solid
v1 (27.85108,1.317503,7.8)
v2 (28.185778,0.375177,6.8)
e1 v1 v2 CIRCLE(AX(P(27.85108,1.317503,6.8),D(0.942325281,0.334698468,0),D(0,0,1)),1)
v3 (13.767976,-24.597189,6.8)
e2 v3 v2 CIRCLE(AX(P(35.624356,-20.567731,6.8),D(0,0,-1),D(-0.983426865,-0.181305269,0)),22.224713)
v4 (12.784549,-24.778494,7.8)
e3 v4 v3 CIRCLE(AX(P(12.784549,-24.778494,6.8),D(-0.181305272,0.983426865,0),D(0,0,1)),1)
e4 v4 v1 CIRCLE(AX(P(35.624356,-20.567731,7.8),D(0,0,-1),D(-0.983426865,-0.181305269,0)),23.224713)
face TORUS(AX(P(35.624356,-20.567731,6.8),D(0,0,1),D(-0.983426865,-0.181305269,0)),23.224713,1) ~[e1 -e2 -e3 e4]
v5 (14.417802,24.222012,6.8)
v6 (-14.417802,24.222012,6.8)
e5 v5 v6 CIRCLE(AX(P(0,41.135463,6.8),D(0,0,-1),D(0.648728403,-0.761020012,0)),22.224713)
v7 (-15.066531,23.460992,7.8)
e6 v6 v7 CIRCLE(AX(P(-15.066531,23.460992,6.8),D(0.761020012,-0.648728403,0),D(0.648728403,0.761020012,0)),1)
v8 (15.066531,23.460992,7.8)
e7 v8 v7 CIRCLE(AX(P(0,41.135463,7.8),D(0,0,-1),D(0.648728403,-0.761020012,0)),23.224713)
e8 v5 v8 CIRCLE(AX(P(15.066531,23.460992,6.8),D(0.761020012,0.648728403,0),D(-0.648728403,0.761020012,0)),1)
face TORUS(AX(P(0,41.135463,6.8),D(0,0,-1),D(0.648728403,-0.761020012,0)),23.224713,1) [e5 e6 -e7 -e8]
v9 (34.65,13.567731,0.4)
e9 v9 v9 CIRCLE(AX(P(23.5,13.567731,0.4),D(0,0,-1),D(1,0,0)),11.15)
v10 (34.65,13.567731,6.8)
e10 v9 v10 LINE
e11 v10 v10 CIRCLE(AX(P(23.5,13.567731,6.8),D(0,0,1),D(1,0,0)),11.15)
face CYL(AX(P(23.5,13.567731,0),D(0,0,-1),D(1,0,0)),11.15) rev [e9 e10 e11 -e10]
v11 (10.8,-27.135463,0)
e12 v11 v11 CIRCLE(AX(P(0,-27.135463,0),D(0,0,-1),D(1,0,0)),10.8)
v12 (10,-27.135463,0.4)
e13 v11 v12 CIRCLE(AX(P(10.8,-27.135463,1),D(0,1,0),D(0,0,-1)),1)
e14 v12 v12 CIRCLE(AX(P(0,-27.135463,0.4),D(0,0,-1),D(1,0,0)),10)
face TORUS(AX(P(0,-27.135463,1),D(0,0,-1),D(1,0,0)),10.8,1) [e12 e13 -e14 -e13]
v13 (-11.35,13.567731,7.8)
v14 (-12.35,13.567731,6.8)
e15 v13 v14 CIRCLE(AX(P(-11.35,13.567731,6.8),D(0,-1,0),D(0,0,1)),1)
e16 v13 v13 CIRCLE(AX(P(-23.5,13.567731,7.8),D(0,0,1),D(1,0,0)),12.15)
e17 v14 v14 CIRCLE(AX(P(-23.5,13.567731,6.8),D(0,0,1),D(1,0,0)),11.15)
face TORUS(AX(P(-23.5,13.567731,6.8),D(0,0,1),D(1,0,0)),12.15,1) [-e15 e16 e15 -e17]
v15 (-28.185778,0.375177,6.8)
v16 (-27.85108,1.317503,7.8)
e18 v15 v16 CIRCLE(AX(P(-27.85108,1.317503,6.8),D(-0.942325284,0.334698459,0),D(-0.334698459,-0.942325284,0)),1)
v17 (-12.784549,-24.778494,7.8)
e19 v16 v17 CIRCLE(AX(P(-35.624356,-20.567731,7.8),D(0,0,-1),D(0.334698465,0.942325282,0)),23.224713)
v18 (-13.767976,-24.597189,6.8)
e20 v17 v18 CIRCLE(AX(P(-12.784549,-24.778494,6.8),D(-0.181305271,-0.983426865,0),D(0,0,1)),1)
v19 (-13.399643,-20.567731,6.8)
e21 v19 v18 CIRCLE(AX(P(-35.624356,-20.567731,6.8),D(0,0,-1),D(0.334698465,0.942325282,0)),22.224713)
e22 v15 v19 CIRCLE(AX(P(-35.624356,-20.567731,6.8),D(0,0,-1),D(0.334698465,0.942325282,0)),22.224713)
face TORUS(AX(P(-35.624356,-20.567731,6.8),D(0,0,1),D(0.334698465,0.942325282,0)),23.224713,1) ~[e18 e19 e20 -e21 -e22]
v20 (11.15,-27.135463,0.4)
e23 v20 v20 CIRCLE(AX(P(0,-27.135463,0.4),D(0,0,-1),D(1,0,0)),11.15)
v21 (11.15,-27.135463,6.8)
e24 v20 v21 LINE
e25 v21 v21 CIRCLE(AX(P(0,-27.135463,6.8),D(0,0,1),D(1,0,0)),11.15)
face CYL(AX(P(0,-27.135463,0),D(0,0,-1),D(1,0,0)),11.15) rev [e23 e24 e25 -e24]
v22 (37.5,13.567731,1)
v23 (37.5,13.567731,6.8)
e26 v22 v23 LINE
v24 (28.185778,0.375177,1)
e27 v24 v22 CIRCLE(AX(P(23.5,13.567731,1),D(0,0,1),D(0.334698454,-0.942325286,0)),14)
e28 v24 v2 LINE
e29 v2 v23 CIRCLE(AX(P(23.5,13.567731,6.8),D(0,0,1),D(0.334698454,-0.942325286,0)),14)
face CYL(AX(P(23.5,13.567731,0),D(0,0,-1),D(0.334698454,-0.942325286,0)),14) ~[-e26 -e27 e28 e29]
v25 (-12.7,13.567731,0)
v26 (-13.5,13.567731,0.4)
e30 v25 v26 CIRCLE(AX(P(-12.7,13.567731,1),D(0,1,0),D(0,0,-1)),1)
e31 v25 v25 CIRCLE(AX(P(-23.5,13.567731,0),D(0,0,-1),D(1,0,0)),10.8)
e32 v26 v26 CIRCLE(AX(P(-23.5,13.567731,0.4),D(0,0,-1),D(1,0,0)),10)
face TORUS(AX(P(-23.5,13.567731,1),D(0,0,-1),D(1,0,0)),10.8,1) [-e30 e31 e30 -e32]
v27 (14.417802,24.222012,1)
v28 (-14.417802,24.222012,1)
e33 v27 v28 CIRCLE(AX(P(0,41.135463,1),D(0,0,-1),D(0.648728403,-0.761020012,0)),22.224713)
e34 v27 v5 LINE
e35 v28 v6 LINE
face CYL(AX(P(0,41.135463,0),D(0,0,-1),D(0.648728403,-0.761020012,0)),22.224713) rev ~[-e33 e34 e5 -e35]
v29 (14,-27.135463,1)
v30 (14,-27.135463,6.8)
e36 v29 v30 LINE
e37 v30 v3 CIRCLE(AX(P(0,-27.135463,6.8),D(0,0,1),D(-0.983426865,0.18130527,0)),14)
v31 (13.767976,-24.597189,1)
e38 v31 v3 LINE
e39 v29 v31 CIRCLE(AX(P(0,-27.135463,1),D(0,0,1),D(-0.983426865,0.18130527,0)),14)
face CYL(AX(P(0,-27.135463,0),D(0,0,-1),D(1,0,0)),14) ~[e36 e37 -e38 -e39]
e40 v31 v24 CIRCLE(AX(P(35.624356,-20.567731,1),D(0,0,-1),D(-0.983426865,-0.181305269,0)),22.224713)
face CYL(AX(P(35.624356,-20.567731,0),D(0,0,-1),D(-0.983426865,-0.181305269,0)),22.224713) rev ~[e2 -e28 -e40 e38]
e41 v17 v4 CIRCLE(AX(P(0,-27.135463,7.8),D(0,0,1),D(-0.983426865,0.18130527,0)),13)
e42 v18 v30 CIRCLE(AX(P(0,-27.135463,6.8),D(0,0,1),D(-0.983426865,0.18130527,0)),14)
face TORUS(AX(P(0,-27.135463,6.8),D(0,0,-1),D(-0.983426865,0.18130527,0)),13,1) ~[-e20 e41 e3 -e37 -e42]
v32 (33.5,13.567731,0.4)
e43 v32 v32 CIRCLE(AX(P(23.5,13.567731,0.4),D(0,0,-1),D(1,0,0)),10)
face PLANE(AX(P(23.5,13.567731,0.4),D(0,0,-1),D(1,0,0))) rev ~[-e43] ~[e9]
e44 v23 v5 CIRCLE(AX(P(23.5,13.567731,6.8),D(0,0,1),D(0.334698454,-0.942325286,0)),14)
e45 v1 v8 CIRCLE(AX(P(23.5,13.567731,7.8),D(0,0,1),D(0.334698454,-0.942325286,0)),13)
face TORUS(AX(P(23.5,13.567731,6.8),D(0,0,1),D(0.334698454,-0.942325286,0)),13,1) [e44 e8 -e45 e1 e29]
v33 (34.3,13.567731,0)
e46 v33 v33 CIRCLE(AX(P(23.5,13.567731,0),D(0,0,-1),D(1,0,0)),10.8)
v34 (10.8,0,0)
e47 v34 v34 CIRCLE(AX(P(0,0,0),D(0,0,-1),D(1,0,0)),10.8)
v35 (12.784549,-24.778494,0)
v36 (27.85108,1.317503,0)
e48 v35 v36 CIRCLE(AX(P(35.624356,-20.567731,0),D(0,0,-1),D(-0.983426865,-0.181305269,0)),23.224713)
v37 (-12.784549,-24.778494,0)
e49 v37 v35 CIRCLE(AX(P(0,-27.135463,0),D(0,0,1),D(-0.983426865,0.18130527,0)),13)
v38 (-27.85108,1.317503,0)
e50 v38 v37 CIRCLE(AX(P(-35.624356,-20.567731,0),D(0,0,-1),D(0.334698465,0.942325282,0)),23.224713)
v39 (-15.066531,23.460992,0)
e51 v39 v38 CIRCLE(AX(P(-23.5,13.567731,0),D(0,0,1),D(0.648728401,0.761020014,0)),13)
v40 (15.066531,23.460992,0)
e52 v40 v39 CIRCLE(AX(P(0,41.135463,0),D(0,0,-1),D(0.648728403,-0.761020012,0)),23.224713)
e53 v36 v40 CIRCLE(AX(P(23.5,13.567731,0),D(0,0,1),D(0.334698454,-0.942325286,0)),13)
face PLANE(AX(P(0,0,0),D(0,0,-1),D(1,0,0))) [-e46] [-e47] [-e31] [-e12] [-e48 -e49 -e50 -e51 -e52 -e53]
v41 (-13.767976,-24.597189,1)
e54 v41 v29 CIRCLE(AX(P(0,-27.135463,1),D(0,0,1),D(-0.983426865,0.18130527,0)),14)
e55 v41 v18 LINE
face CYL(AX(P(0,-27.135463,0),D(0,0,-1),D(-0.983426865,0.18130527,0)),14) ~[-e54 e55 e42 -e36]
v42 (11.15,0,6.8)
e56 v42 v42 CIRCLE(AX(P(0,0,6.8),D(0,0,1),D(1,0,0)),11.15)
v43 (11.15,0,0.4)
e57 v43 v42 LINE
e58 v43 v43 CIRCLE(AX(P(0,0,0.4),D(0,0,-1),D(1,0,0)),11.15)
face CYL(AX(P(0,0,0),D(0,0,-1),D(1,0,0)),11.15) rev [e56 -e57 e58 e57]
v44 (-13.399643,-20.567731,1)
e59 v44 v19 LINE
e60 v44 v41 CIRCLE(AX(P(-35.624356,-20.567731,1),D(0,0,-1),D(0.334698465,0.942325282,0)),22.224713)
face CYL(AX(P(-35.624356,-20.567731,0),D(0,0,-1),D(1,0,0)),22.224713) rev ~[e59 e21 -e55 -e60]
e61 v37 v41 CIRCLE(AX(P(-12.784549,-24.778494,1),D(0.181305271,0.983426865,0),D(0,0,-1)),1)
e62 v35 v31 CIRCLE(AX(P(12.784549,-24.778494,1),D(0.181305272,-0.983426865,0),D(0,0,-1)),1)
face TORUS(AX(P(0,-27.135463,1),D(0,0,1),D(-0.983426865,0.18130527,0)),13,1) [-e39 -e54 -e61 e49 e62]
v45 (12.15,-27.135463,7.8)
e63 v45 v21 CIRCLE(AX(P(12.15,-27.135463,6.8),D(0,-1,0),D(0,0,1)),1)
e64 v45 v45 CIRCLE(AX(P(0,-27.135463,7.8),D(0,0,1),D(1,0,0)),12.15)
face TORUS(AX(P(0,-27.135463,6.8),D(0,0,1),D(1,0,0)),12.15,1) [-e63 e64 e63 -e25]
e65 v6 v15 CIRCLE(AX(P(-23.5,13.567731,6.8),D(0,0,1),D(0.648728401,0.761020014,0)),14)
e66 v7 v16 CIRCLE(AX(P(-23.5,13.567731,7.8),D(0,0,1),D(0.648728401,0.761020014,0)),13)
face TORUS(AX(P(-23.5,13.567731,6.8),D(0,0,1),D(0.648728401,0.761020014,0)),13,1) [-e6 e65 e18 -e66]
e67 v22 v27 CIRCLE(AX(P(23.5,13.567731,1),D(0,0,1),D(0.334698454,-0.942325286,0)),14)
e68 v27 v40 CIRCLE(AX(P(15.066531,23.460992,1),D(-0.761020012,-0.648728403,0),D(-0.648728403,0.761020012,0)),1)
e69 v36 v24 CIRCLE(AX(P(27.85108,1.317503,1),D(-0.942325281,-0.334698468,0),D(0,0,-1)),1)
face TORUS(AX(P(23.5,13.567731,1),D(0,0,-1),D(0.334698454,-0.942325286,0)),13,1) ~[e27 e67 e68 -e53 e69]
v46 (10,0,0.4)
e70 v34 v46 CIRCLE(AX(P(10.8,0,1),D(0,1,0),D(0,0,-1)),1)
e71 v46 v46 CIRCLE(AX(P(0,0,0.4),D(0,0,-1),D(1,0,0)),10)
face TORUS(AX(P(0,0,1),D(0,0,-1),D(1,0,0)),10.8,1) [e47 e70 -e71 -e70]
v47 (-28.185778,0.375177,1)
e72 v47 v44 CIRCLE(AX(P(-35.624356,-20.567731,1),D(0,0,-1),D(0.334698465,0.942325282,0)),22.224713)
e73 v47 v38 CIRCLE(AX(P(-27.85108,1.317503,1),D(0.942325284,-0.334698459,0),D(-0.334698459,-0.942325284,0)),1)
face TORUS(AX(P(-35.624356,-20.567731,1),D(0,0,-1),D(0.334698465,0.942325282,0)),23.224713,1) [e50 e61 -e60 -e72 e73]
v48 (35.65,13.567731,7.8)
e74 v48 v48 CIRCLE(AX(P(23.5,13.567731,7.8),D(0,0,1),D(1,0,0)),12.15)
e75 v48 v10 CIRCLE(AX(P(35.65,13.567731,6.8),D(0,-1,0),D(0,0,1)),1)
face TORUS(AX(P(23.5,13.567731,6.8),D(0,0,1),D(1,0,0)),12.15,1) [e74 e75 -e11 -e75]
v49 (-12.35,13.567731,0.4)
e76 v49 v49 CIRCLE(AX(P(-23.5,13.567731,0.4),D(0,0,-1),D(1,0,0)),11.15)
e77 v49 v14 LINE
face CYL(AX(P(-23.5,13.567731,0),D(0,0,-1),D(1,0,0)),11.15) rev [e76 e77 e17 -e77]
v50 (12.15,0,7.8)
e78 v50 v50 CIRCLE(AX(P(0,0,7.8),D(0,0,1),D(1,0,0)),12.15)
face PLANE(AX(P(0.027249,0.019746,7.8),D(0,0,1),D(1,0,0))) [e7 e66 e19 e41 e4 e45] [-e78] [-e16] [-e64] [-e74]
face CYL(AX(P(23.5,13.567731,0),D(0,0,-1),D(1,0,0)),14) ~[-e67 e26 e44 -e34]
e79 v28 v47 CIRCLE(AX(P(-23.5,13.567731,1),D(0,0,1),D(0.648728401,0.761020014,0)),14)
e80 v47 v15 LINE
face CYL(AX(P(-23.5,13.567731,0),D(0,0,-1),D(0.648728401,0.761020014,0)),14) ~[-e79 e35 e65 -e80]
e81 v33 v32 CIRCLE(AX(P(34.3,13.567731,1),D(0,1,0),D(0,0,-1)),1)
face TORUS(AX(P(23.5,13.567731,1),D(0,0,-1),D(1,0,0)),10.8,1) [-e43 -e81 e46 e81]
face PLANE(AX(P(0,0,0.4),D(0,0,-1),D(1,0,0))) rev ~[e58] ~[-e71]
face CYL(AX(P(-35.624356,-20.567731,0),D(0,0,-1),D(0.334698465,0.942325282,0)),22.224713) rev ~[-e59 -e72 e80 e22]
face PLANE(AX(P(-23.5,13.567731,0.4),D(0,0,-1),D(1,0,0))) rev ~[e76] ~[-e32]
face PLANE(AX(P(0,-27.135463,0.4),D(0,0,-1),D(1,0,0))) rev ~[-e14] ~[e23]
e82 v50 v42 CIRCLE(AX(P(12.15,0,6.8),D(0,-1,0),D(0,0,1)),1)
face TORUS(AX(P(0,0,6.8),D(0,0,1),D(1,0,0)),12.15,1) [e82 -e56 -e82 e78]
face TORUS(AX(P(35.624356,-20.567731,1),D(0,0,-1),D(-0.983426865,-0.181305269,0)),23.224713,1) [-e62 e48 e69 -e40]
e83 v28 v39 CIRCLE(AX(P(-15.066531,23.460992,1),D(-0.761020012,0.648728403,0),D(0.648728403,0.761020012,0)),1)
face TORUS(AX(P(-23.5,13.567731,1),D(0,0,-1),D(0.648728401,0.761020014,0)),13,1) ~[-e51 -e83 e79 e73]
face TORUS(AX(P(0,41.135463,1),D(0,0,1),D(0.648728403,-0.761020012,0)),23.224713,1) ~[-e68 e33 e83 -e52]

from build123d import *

# Parameters (mm, degrees)
F0_R         = 11.15
F1_DEPTH     = 7.8
F2_R         = 11.15
F2_R_2       = 10
F3_DEPTH     = 0.4
F4_R         = 11.15
F4_R_2       = 10
F5_DEPTH     = 0.4
F6_T10_ANGLE = 80.8915948213
F6_T12_ANGLE = 200.8915947618
F6_T14_ANGLE = 80.8915945525
F6_T16_ANGLE = 200.8915947547
F6_T18_ANGLE = 80.8915942666
F6_T20_ANGLE = 200.8915950895
F6_T22_ANGLE = 80.8915948213
F6_T24_ANGLE = 200.8915947618
F6_T26_ANGLE = 80.8915945525
F6_T28_ANGLE = 200.8915947547
F6_T30_ANGLE = 80.8915942666
F6_T32_ANGLE = 200.8915950895


# Not quite as in the source:
# - a fillet or chamfer that OpenCascade refuses, or shapes differently, is made with other operations: its cross-section is extruded or revolved along the edge and cut away or added


with BuildPart() as f1:
    # F0 (on Top) → F1 (new body)
    with BuildSketch(Plane.XY):
        with BuildLine():
            ThreePointArc((-14.4178023884, 24.2220115243), (-10.7887694034, 19.434980828), (-9.5, 13.567731326))
            ThreePointArc((-9.5, 13.567731326), (-15.4253761081, 2.1309289317), (-28.1857784292, 0.3751773461))
            ThreePointArc((-28.1857784292, 0.3751773461), (-17.4686665105, -7.7494316525), (-13.3996429494, -20.567731326))
            ThreePointArc((-13.3996429494, -20.567731326), (-13.4919177982, -22.5908599334), (-13.7679761122, -24.5971888737))
            ThreePointArc((-13.7679761122, -24.5971888737), (-1.54e-08, -13.1354626519), (13.7679761066, -24.5971888434))
            ThreePointArc((13.7679761066, -24.5971888434), (16.3771898334, -9.4553750199), (28.1857783538, 0.3751773193))
            ThreePointArc((28.1857783538, 0.3751773193), (11.3756443069, 6.5677313954), (14.4178023884, 24.2220115243))
            ThreePointArc((14.4178023884, 24.2220115243), (0, 18.9107499483), (-14.4178023884, 24.2220115243))
        make_face()
        Circle(F0_R, mode=Mode.SUBTRACT)
        with BuildLine():
            ThreePointArc((-28.1857784292, 0.3751773461), (-15.4253761081, 2.1309289317), (-9.5, 13.567731326))
            ThreePointArc((-9.5, 13.567731326), (-10.7887694034, 19.434980828), (-14.4178023884, 24.2220115243))
            ThreePointArc((-14.4178023884, 24.2220115243), (-35.6243556731, 20.5677312911), (-28.1857784292, 0.3751773461))
        make_face()
        with Locations((-23.5, 13.567731326)):
            Circle(F0_R, mode=Mode.SUBTRACT)
        with BuildLine():
            ThreePointArc((37.5, 13.567731326), (29.367249502, 26.2789619226), (14.4178023884, 24.2220115243))
            ThreePointArc((14.4178023884, 24.2220115243), (11.3756443069, 6.5677313954), (28.1857783538, 0.3751773193))
            ThreePointArc((28.1857783538, 0.3751773193), (34.9368023711, 5.4931074014), (37.5, 13.567731326))
        make_face()
        with Locations((23.5, 13.567731326)):
            Circle(F0_R, mode=Mode.SUBTRACT)
        with BuildLine():
            ThreePointArc((13.7679761066, -24.5971888434), (-1.54e-08, -13.1354626519), (-13.7679761122, -24.5971888737))
            ThreePointArc((-13.7679761122, -24.5971888737), (-1.2744281911, -41.0773360119), (14, -27.1354626519))
            ThreePointArc((14, -27.1354626519), (13.9418733586, -25.8610344454), (13.7679761066, -24.5971888434))
        make_face()
        with Locations((0, -27.1354626519)):
            Circle(F0_R, mode=Mode.SUBTRACT)
    extrude(amount=F1_DEPTH)

    # F2 (on face) → F3 (join)
    with BuildSketch(Plane(origin=(0, 0, 0), x_dir=(1, 0, 0), z_dir=(0, 0, -1))):
        with Locations((0, 27.1354626519)):
            Circle(F2_R)
        with Locations((0, 27.1354626519)):
            Circle(F2_R_2, mode=Mode.SUBTRACT)
        with Locations((23.5, -13.567731326)):
            Circle(F2_R)
        with Locations((23.5, -13.567731326)):
            Circle(F2_R_2, mode=Mode.SUBTRACT)
        with Locations((-23.5, -13.567731326)):
            Circle(F2_R)
        with Locations((-23.5, -13.567731326)):
            Circle(F2_R_2, mode=Mode.SUBTRACT)
    extrude(amount=-F3_DEPTH)

    # F4 (on face) → F5 (join)
    with BuildSketch(Plane(origin=(0, 0, 0), x_dir=(1, 0, 0), z_dir=(0, 0, -1))):
        Circle(F4_R)
        Circle(F4_R_2, mode=Mode.SUBTRACT)
    extrude(amount=-F5_DEPTH)

    # F6: fillet of radius 1 on 20 edges, made by hand

    # F6_s1 → F6_t2 (revolve, cut)
    with BuildSketch(Plane.XZ.offset(-13.567731326)):
        with BuildLine():
            ThreePointArc((-11.35, 7.8), (-12.0571067812, 7.5071067812), (-12.35, 6.8))
            Line((-12.35, 6.8), (-12.35, 7.8))
            Line((-12.35, 7.8), (-11.35, 7.8))
        make_face()
    revolve(axis=Axis((-23.5, 13.567731326, 7.8), (0, 0, 1)), mode=Mode.SUBTRACT)

    # F6_s3 → F6_t4 (revolve, cut)
    with BuildSketch(Plane.XZ.offset(27.1354626519)):
        with BuildLine():
            ThreePointArc((12.15, 7.8), (11.4428932188, 7.5071067812), (11.15, 6.8))
            Line((11.15, 6.8), (11.15, 7.8))
            Line((11.15, 7.8), (12.15, 7.8))
        make_face()
    revolve(axis=Axis((0, -27.1354626519, 7.8), (0, 0, 1)), mode=Mode.SUBTRACT)

    # F6_s5 → F6_t6 (revolve, cut)
    with BuildSketch(Plane.XZ):
        with BuildLine():
            ThreePointArc((12.15, 7.8), (11.4428932188, 7.5071067812), (11.15, 6.8))
            Line((11.15, 6.8), (11.15, 7.8))
            Line((11.15, 7.8), (12.15, 7.8))
        make_face()
    revolve(axis=Axis((0, 0, 7.8), (0, 0, 1)), mode=Mode.SUBTRACT)

    # F6_s7 → F6_t8 (revolve, cut)
    with BuildSketch(Plane.XZ.offset(-13.567731326)):
        with BuildLine():
            ThreePointArc((35.65, 7.8), (34.9428932188, 7.5071067812), (34.65, 6.8))
            Line((34.65, 6.8), (34.65, 7.8))
            Line((34.65, 7.8), (35.65, 7.8))
        make_face()
    revolve(axis=Axis((23.5, 13.567731326, 7.8), (0, 0, 1)), mode=Mode.SUBTRACT)

    # F6_s9 → F6_t10 (revolve, cut)
    with BuildSketch(Plane(origin=(20.3083844645, 17.3117994564, 0), x_dir=(0, 0, 1), z_dir=(0.761020012, 0.6487284034, 0))):
        with BuildLine():
            ThreePointArc((6.8, -9.0801975759), (7.5071067812, -8.7873043571), (7.8, -8.0801975759))
            Line((7.8, -8.0801975759), (7.8, -9.0801975759))
            Line((7.8, -9.0801975759), (6.8, -9.0801975759))
        make_face()
    revolve(axis=Axis((0, 41.1354626519, 7.8), (0, 0, -1)), revolution_arc=F6_T10_ANGLE, mode=Mode.SUBTRACT)

    # F6_s11 → F6_t12 (revolve, cut)
    with BuildSketch(Plane(origin=(-20.3083844997, 17.3117993675, 0), x_dir=(0, 0, 1), z_dir=(0.7610200142, -0.6487284008, 0))):
        with BuildLine():
            ThreePointArc((6.8, -9.0801976664), (7.5071067812, -8.7873044476), (7.8, -8.0801976664))
            Line((7.8, -8.0801976664), (7.8, -9.0801976664))
            Line((7.8, -9.0801976664), (6.8, -9.0801976664))
        make_face()
    revolve(axis=Axis((-23.5, 13.567731326, 7.8), (0, 0, 1)), revolution_arc=F6_T12_ANGLE, mode=Mode.SUBTRACT)

    # F6_s13 → F6_t14 (revolve, cut)
    with BuildSketch(Plane(origin=(-25.1466502077, 8.9316771809, 0), x_dir=(0, 0, 1), z_dir=(-0.9423252823, 0.3346984649, 0))):
        with BuildLine():
            ThreePointArc((7.8, -8.0801976725), (7.5071067812, -8.7873044537), (6.8, -9.0801976725))
            Line((6.8, -9.0801976725), (7.8, -9.0801976725))
            Line((7.8, -9.0801976725), (7.8, -8.0801976725))
        make_face()
    revolve(axis=Axis((-35.624355653, -20.567731326, 7.8), (0, 0, -1)), revolution_arc=F6_T14_ANGLE, mode=Mode.SUBTRACT)

    # F6_s15 → F6_t16 (revolve, cut)
    with BuildSketch(Plane(origin=(-4.8382658309, -26.2434765539, 0), x_dir=(0, 0, 1), z_dir=(0.1813052699, 0.9834268652, 0))):
        with BuildLine():
            ThreePointArc((7.8, -8.0801976209), (7.5071067812, -8.787304402), (6.8, -9.0801976209))
            Line((6.8, -9.0801976209), (7.8, -9.0801976209))
            Line((7.8, -9.0801976209), (7.8, -8.0801976209))
        make_face()
    revolve(axis=Axis((0, -27.1354626519, 7.8), (0, 0, 1)), revolution_arc=F6_T16_ANGLE, mode=Mode.SUBTRACT)

    # F6_s17 → F6_t18 (revolve, cut)
    with BuildSketch(Plane(origin=(4.8382658036, -26.2434765203, 0), x_dir=(0, 0, 1), z_dir=(0.1813052691, -0.9834268653, 0))):
        with BuildLine():
            ThreePointArc((7.8, -8.0801976417), (7.5071067812, -8.7873044229), (6.8, -9.0801976417))
            Line((6.8, -9.0801976417), (7.8, -9.0801976417))
            Line((7.8, -9.0801976417), (7.8, -8.0801976417))
        make_face()
    revolve(axis=Axis((35.624355653, -20.567731326, 7.8), (0, 0, -1)), revolution_arc=F6_T18_ANGLE, mode=Mode.SUBTRACT)

    # F6_s19 → F6_t20 (revolve, cut)
    with BuildSketch(Plane(origin=(25.1466503366, 8.9316768958, 0), x_dir=(0, 0, 1), z_dir=(-0.9423252862, -0.3346984538, 0))):
        with BuildLine():
            ThreePointArc((6.8, -9.0801973606), (7.5071067812, -8.7873041418), (7.8, -8.0801973606))
            Line((7.8, -8.0801973606), (7.8, -9.0801973606))
            Line((7.8, -9.0801973606), (6.8, -9.0801973606))
        make_face()
    revolve(axis=Axis((23.5, 13.567731326, 7.8), (0, 0, 1)), revolution_arc=F6_T20_ANGLE, mode=Mode.SUBTRACT)

    # F6_s21 → F6_t22 (revolve, cut)
    with BuildSketch(Plane(origin=(20.3083844645, 17.3117994564, 0), x_dir=(0, 0, 1), z_dir=(0.761020012, 0.6487284034, 0))):
        with BuildLine():
            ThreePointArc((1, -9.0801975759), (0.2928932188, -8.7873043571), (0, -8.0801975759))
            Line((0, -8.0801975759), (0, -9.0801975759))
            Line((0, -9.0801975759), (1, -9.0801975759))
        make_face()
    revolve(axis=Axis((0, 41.1354626519, 0), (0, 0, -1)), revolution_arc=F6_T22_ANGLE, mode=Mode.SUBTRACT)

    # F6_s23 → F6_t24 (revolve, cut)
    with BuildSketch(Plane(origin=(-20.3083844997, 17.3117993675, 0), x_dir=(0, 0, 1), z_dir=(0.7610200142, -0.6487284008, 0))):
        with BuildLine():
            ThreePointArc((1, -9.0801976664), (0.2928932188, -8.7873044476), (0, -8.0801976664))
            Line((0, -8.0801976664), (0, -9.0801976664))
            Line((0, -9.0801976664), (1, -9.0801976664))
        make_face()
    revolve(axis=Axis((-23.5, 13.567731326, 0), (0, 0, 1)), revolution_arc=F6_T24_ANGLE, mode=Mode.SUBTRACT)

    # F6_s25 → F6_t26 (revolve, cut)
    with BuildSketch(Plane(origin=(-25.1466502077, 8.9316771809, 0), x_dir=(0, 0, 1), z_dir=(-0.9423252823, 0.3346984649, 0))):
        with BuildLine():
            ThreePointArc((0, -8.0801976725), (0.2928932188, -8.7873044537), (1, -9.0801976725))
            Line((1, -9.0801976725), (0, -9.0801976725))
            Line((0, -9.0801976725), (0, -8.0801976725))
        make_face()
    revolve(axis=Axis((-35.624355653, -20.567731326, 0), (0, 0, -1)), revolution_arc=F6_T26_ANGLE, mode=Mode.SUBTRACT)

    # F6_s27 → F6_t28 (revolve, cut)
    with BuildSketch(Plane(origin=(-4.8382658309, -26.2434765539, 0), x_dir=(0, 0, 1), z_dir=(0.1813052699, 0.9834268652, 0))):
        with BuildLine():
            ThreePointArc((0, -8.0801976209), (0.2928932188, -8.787304402), (1, -9.0801976209))
            Line((1, -9.0801976209), (0, -9.0801976209))
            Line((0, -9.0801976209), (0, -8.0801976209))
        make_face()
    revolve(axis=Axis((0, -27.1354626519, 0), (0, 0, 1)), revolution_arc=F6_T28_ANGLE, mode=Mode.SUBTRACT)

    # F6_s29 → F6_t30 (revolve, cut)
    with BuildSketch(Plane(origin=(4.8382658036, -26.2434765203, 0), x_dir=(0, 0, 1), z_dir=(0.1813052691, -0.9834268653, 0))):
        with BuildLine():
            ThreePointArc((0, -8.0801976417), (0.2928932188, -8.7873044229), (1, -9.0801976417))
            Line((1, -9.0801976417), (0, -9.0801976417))
            Line((0, -9.0801976417), (0, -8.0801976417))
        make_face()
    revolve(axis=Axis((35.624355653, -20.567731326, 0), (0, 0, -1)), revolution_arc=F6_T30_ANGLE, mode=Mode.SUBTRACT)

    # F6_s31 → F6_t32 (revolve, cut)
    with BuildSketch(Plane(origin=(25.1466503366, 8.9316768958, 0), x_dir=(0, 0, 1), z_dir=(-0.9423252862, -0.3346984538, 0))):
        with BuildLine():
            ThreePointArc((1, -9.0801973606), (0.2928932188, -8.7873041418), (0, -8.0801973606))
            Line((0, -8.0801973606), (0, -9.0801973606))
            Line((0, -9.0801973606), (1, -9.0801973606))
        make_face()
    revolve(axis=Axis((23.5, 13.567731326, 0), (0, 0, 1)), revolution_arc=F6_T32_ANGLE, mode=Mode.SUBTRACT)

    # F6_s33 → F6_t34 (revolve, cut)
    with BuildSketch(Plane.XZ.offset(-13.567731326)):
        with BuildLine():
            ThreePointArc((-12.7, 0), (-13.1472135955, 0.105572809), (-13.5, 0.4))
            Line((-13.5, 0.4), (-13.5, 0))
            Line((-13.5, 0), (-12.7, 0))
        make_face()
    revolve(axis=Axis((-23.5, 13.567731326, 0), (0, 0, -1)), mode=Mode.SUBTRACT)

    # F6_s35 → F6_t36 (revolve, cut)
    with BuildSketch(Plane.XZ.offset(-13.567731326)):
        with BuildLine():
            ThreePointArc((34.3, 0), (33.8527864045, 0.105572809), (33.5, 0.4))
            Line((33.5, 0.4), (33.5, 0))
            Line((33.5, 0), (34.3, 0))
        make_face()
    revolve(axis=Axis((23.5, 13.567731326, 0), (0, 0, -1)), mode=Mode.SUBTRACT)

    # F6_s37 → F6_t38 (revolve, cut)
    with BuildSketch(Plane.XZ.offset(27.1354626519)):
        with BuildLine():
            ThreePointArc((10.8, 0), (10.3527864045, 0.105572809), (10, 0.4))
            Line((10, 0.4), (10, 0))
            Line((10, 0), (10.8, 0))
        make_face()
    revolve(axis=Axis((0, -27.1354626519, 0), (0, 0, -1)), mode=Mode.SUBTRACT)

    # F6_s39 → F6_t40 (revolve, cut)
    with BuildSketch(Plane.XZ):
        with BuildLine():
            ThreePointArc((10.8, 0), (10.3527864045, 0.105572809), (10, 0.4))
            Line((10, 0.4), (10, 0))
            Line((10, 0), (10.8, 0))
        make_face()
    revolve(axis=Axis((0, 0, 0), (0, 0, -1)), mode=Mode.SUBTRACT)


solid = f1.part
